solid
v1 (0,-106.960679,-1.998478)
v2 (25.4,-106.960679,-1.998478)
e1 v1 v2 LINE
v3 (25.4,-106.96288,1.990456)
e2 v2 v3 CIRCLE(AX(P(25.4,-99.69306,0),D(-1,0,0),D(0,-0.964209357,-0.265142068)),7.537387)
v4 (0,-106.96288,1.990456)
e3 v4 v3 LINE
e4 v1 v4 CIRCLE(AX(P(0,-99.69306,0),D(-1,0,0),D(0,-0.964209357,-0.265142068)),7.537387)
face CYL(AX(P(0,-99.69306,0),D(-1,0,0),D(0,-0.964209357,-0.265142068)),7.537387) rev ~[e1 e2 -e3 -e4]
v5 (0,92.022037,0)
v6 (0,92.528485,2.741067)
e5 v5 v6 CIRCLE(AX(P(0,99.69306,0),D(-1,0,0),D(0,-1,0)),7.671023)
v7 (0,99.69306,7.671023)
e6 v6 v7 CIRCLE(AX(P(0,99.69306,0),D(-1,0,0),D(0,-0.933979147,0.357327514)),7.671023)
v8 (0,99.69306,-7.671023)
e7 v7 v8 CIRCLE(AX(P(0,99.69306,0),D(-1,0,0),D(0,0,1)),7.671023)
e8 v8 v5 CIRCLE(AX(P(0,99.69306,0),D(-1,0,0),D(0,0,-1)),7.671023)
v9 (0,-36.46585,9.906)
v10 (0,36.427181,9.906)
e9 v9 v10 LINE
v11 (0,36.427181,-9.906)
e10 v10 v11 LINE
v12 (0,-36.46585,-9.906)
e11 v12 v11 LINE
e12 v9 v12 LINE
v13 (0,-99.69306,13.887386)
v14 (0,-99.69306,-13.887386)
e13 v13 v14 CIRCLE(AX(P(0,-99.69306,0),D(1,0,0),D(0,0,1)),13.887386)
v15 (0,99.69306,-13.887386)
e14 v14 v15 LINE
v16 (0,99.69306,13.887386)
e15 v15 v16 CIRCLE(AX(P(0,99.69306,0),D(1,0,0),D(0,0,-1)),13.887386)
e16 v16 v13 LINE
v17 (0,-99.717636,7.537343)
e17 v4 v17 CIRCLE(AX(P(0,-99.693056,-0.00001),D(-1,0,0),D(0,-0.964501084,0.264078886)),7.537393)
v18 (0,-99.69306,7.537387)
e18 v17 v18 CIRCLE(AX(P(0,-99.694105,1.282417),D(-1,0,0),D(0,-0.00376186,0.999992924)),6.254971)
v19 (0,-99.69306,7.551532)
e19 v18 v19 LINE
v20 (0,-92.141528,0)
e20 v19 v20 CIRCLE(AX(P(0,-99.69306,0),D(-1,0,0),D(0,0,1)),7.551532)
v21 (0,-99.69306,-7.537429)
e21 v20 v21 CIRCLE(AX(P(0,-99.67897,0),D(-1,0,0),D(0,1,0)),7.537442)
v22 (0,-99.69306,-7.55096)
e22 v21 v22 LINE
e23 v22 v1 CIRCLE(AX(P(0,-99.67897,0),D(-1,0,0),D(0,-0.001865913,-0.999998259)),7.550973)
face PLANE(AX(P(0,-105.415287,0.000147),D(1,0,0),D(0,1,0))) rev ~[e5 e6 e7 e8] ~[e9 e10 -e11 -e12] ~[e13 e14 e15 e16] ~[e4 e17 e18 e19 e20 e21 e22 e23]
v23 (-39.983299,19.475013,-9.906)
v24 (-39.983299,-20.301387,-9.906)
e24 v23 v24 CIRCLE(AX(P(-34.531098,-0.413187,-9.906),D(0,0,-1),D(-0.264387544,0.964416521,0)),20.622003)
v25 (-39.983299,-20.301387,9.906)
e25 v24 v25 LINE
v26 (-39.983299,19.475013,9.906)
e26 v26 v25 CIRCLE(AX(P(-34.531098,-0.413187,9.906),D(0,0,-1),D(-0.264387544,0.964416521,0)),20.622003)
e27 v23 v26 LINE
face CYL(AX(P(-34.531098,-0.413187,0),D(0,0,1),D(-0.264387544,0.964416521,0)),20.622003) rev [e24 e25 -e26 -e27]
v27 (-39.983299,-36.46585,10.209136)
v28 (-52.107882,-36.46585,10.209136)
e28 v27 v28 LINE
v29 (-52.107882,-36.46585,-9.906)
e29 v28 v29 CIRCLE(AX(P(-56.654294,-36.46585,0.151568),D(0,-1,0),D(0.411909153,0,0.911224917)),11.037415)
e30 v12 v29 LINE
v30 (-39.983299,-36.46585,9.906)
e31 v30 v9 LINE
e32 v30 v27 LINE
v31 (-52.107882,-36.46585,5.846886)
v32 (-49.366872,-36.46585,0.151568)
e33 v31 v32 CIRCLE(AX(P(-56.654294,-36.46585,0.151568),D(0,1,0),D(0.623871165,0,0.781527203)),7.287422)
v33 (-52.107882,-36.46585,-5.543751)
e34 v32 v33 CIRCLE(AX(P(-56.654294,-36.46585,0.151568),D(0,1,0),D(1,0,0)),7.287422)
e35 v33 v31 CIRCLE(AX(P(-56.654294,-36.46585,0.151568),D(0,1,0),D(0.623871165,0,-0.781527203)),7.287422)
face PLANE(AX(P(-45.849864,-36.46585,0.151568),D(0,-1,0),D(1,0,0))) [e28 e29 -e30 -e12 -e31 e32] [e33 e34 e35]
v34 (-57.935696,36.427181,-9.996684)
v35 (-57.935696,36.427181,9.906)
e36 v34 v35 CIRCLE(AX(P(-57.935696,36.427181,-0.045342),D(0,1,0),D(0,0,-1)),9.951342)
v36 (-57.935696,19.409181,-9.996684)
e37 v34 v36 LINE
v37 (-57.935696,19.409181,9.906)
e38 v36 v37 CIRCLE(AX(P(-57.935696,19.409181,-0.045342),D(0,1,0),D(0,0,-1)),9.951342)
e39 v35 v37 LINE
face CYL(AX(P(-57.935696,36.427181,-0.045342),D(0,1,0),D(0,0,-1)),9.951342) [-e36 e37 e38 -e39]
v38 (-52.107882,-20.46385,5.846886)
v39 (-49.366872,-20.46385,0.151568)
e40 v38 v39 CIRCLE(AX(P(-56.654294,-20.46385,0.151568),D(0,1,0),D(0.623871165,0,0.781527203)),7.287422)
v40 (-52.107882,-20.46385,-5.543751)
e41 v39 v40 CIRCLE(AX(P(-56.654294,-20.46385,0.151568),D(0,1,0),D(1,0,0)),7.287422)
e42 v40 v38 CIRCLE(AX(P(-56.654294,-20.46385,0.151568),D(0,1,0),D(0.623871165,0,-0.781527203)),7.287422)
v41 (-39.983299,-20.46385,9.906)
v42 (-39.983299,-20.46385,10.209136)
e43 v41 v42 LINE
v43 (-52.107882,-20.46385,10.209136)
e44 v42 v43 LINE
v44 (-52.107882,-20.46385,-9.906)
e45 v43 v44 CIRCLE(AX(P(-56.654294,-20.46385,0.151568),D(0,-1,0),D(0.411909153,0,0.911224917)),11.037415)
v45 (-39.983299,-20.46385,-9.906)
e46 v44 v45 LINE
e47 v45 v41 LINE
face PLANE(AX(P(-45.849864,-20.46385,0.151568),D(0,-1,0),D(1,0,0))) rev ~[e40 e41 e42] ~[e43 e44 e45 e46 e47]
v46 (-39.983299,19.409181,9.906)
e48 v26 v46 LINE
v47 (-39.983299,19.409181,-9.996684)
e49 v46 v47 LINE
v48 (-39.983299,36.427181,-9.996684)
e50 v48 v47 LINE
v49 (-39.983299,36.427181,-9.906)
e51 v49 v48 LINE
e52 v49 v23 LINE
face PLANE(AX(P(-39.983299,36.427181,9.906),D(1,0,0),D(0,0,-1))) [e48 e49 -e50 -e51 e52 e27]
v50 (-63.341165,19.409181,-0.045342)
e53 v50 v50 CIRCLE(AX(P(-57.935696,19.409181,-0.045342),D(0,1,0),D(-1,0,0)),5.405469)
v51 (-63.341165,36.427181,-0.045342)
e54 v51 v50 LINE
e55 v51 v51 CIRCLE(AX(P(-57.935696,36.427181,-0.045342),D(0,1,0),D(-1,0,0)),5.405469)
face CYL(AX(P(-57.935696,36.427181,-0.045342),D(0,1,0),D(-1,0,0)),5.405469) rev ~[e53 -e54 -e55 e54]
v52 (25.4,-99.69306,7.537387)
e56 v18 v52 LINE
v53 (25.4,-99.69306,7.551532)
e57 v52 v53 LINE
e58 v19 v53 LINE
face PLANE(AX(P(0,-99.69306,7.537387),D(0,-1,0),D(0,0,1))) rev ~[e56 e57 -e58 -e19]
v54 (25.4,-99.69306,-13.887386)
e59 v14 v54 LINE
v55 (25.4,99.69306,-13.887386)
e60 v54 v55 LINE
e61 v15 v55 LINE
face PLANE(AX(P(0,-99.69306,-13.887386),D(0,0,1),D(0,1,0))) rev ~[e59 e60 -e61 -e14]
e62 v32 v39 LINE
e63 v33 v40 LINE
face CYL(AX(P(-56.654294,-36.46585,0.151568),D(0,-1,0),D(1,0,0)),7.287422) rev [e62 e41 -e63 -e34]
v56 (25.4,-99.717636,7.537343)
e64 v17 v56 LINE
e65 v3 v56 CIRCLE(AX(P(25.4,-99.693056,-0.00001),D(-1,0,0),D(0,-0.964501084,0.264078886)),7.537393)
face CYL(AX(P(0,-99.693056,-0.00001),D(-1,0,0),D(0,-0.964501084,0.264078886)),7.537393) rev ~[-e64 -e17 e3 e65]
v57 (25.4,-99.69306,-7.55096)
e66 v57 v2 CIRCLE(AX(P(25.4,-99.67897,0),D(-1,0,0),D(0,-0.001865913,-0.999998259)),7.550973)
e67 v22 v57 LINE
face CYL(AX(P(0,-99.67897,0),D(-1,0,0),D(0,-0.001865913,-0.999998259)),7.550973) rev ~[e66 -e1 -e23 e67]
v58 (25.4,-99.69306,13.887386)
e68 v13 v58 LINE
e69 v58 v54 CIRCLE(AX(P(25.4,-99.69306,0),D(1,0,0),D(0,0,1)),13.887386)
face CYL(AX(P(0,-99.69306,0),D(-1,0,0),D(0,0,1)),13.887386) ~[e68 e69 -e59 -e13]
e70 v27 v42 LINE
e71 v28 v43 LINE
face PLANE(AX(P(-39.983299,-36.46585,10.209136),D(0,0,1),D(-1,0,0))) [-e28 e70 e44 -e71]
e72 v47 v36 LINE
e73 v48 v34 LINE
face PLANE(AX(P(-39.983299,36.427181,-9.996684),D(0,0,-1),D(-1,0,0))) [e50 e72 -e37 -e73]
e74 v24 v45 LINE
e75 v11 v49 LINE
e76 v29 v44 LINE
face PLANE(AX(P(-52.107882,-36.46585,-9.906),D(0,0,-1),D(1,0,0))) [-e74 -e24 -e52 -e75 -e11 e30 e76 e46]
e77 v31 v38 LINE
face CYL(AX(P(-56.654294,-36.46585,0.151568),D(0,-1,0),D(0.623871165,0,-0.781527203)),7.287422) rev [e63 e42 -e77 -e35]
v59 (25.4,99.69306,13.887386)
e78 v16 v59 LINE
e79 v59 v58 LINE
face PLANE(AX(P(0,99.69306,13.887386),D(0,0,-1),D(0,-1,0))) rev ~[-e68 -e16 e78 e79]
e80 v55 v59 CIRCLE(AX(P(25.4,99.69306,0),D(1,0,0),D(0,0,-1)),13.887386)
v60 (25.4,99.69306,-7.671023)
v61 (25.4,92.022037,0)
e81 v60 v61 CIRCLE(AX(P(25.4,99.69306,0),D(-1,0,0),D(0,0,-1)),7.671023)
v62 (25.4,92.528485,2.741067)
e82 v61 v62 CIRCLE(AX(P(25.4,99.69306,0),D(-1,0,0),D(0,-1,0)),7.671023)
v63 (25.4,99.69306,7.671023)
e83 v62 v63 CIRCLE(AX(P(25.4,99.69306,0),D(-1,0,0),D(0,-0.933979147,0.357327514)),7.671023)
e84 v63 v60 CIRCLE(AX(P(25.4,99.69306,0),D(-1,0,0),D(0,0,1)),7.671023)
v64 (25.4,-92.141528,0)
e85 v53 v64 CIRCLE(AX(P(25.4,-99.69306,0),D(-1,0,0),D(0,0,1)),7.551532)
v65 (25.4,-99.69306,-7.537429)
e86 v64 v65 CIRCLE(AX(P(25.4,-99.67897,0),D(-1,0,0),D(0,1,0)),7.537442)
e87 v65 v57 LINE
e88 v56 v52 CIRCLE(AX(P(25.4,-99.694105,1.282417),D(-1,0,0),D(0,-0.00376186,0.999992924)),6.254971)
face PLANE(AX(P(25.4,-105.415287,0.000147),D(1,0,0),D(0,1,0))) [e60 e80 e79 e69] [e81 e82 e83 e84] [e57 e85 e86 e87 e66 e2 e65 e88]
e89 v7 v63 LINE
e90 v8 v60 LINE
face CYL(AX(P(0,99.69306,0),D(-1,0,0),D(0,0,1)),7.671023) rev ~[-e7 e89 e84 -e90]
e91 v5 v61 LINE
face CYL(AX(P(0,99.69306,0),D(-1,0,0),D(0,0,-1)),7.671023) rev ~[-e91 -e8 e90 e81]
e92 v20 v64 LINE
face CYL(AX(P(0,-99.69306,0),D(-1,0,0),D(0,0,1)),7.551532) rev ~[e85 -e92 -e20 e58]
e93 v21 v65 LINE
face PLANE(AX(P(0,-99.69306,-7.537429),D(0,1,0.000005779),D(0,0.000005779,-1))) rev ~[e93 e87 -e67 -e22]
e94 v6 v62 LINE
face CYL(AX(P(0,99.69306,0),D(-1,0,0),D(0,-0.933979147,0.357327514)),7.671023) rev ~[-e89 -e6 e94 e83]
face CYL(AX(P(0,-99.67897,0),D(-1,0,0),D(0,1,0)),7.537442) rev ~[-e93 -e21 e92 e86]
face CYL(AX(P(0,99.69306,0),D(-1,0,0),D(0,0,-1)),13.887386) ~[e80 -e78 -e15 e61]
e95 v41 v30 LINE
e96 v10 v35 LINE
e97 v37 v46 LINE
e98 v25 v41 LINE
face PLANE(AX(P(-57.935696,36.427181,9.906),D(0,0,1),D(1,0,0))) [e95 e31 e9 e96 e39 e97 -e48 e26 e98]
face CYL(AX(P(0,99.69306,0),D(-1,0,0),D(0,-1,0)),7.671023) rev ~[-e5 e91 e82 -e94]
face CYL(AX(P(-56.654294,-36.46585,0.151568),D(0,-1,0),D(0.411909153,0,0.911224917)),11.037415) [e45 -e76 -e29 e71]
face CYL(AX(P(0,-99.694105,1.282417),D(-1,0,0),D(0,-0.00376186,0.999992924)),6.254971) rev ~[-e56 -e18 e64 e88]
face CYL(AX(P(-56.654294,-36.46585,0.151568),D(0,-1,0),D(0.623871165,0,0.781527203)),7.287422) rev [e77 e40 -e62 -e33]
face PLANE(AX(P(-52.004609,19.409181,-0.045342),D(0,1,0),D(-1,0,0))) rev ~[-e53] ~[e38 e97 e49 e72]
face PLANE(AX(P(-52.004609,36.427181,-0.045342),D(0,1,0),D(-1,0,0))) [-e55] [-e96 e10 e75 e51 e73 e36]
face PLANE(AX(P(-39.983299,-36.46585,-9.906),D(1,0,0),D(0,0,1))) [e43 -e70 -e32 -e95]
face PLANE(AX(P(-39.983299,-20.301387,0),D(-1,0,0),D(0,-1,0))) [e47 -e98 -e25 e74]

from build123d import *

# Parameters (mm, degrees)
F1_DEPTH = 25.4
F3_DEPTH = 9.906
F4_R     = 5.4054687582
F5_DEPTH = 17.018
F7_DEPTH = 16.002


# Not quite as in the source:
# - ends of sketch curves that miss each other by under 0.0002 mm in the source are joined


with BuildPart() as f1:
    # F0 (on Right) → F1 (new body)
    with BuildSketch(Plane.YZ):
        with BuildLine():
            Line((-99.6930599213, 7.5515317731), (-99.6930599213, 13.8873864871))
            ThreePointArc((-99.6930599213, 13.8873864871), (-113.5804464084, 0), (-99.6930599213, -13.8873864871))
            Line((-99.6930599213, -13.8873864871), (-99.6930599213, -7.5509602816))
            ThreePointArc((-99.6930599213, -7.5509602816), (-104.2631477896, -6.0002098207), (-106.9606792933, -1.9984784576))
            ThreePointArc((-106.9606792933, -1.9984784576), (-107.2304460851, -0.0041593028), (-106.9628804792, 1.9904563644))
            ThreePointArc((-106.9628804792, 1.9904563644), (-104.2749842635, 5.9848237142), (-99.7176355394, 7.5373431398))
            ThreePointArc((-99.7176355394, 7.5373431398), (-99.7053477533, 7.5373772953), (-99.6930599213, 7.5373873115))
            Line((-99.6930599213, 7.5373873115), (-99.6930599213, 7.5515317731))
        make_face()
        with BuildLine():
            Line((99.6930599213, 13.8873864871), (-99.6930599213, 13.8873864871))
            Line((-99.6930599213, 13.8873864871), (-99.6930599213, 7.5515317731))
            ThreePointArc((-99.6930599213, 7.5515317731), (-94.3533205962, 5.3397393251), (-92.1415281482, 0))
            ThreePointArc((-92.1415281482, 0), (-94.3541776231, -5.33475565), (-99.6930599995, -7.5374291426))
            Line((-99.6930599995, -7.5374291426), (-99.6930599213, -7.5509602816))
            Line((-99.6930599213, -7.5509602816), (-99.6930599213, -13.8873864871))
            Line((-99.6930599213, -13.8873864871), (99.6930599213, -13.8873864871))
            Line((99.6930599213, -13.8873864871), (99.6930599213, -7.671022612))
            ThreePointArc((99.6930599213, -7.671022612), (94.2688278137, -5.4242321076), (92.0220373093, 0))
            ThreePointArc((92.0220373093, 0), (92.1497116605, 1.39373058), (92.5284847617, 2.7410674375))
            ThreePointArc((92.5284847617, 2.7410674375), (95.3446235575, 6.3194690523), (99.6930599213, 7.671022612))
            Line((99.6930599213, 7.671022612), (99.6930599213, 13.8873864871))
        make_face()
        with BuildLine():
            ThreePointArc((99.6930599213, -13.8873864871), (113.5804464084, 0), (99.6930599213, 13.8873864871))
            Line((99.6930599213, 13.8873864871), (99.6930599213, 7.671022612))
            ThreePointArc((99.6930599213, 7.671022612), (107.3640825332, 0), (99.6930599213, -7.671022612))
            Line((99.6930599213, -7.671022612), (99.6930599213, -13.8873864871))
        make_face()
    extrude(amount=F1_DEPTH)

    # F2 (on Top) → F3 (join, symmetric)
    with BuildSketch(Plane.XY):
        with BuildLine():
            Line((0, 0), (0, 36.4271812141))
            Line((0, 36.4271812141), (-39.9832986295, 36.4271812141))
            Line((-39.9832986295, 36.4271812141), (-39.9832986295, 19.475013286))
            ThreePointArc((-39.9832986295, 19.475013286), (-13.9090954175, -0.413186714), (-39.9832986295, -20.301386714))
            Line((-39.9832986295, -20.301386714), (-39.9832986295, -36.4658497274))
            Line((-39.9832986295, -36.4658497274), (0, -36.4658497274))
            Line((0, -36.4658497274), (0, -36.4271812141))
            Line((0, -36.4271812141), (0, 0))
        make_face()
    extrude(amount=F3_DEPTH, both=True)

    # F4 (on face) → F5 (join)
    with BuildSketch(Plane(origin=(0, 36.4271812141, 0), x_dir=(-1, 0, 0), z_dir=(0, 1, 0))):
        with BuildLine():
            Line((57.9356960952, 9.906), (39.9832986295, 9.906))
            Line((39.9832986295, 9.906), (39.9832986295, -9.906))
            Line((39.9832986295, -9.906), (39.9832986295, -9.9966842681))
            Line((39.9832986295, -9.9966842681), (57.9356960952, -9.9966842681))
            ThreePointArc((57.9356960952, -9.9966842681), (67.8870382293, -0.0453421341), (57.9356960952, 9.906))
        make_face()
        with Locations((57.9356960952, -0.0453421341)):
            Circle(F4_R, mode=Mode.SUBTRACT)
    extrude(amount=-F5_DEPTH)

    # F6 (on face) → F7 (join)
    with BuildSketch(Plane.XZ.offset(36.4658497274)):
        with BuildLine():
            Line((-52.1078817546, -9.906), (-39.9832986295, -9.906))
            Line((-39.9832986295, -9.906), (-39.9832986295, 9.906))
            Line((-39.9832986295, 9.906), (-39.9832986295, 10.2091357112))
            Line((-39.9832986295, 10.2091357112), (-52.1078817546, 10.2091357112))
            Line((-52.1078817546, 10.2091357112), (-52.1078817546, 5.8468863204))
            ThreePointArc((-52.1078817546, 5.8468863204), (-50.0877827712, 3.3118599928), (-49.366872241, 0.1515678556))
            ThreePointArc((-49.366872241, 0.1515678556), (-50.0877827712, -3.0087242816), (-52.1078817546, -5.5437506092))
            Line((-52.1078817546, -5.5437506092), (-52.1078817546, -9.906))
        make_face()
        with BuildLine():
            ThreePointArc((-52.1078817546, 10.2091357112), (-67.6917094663, 0.1515678556), (-52.1078817546, -9.906))
            Line((-52.1078817546, -9.906), (-52.1078817546, -5.5437506092))
            ThreePointArc((-52.1078817546, -5.5437506092), (-63.9417160607, 0.1515678556), (-52.1078817546, 5.8468863204))
            Line((-52.1078817546, 5.8468863204), (-52.1078817546, 10.2091357112))
        make_face()
    extrude(amount=-F7_DEPTH)


solid = f1.part
